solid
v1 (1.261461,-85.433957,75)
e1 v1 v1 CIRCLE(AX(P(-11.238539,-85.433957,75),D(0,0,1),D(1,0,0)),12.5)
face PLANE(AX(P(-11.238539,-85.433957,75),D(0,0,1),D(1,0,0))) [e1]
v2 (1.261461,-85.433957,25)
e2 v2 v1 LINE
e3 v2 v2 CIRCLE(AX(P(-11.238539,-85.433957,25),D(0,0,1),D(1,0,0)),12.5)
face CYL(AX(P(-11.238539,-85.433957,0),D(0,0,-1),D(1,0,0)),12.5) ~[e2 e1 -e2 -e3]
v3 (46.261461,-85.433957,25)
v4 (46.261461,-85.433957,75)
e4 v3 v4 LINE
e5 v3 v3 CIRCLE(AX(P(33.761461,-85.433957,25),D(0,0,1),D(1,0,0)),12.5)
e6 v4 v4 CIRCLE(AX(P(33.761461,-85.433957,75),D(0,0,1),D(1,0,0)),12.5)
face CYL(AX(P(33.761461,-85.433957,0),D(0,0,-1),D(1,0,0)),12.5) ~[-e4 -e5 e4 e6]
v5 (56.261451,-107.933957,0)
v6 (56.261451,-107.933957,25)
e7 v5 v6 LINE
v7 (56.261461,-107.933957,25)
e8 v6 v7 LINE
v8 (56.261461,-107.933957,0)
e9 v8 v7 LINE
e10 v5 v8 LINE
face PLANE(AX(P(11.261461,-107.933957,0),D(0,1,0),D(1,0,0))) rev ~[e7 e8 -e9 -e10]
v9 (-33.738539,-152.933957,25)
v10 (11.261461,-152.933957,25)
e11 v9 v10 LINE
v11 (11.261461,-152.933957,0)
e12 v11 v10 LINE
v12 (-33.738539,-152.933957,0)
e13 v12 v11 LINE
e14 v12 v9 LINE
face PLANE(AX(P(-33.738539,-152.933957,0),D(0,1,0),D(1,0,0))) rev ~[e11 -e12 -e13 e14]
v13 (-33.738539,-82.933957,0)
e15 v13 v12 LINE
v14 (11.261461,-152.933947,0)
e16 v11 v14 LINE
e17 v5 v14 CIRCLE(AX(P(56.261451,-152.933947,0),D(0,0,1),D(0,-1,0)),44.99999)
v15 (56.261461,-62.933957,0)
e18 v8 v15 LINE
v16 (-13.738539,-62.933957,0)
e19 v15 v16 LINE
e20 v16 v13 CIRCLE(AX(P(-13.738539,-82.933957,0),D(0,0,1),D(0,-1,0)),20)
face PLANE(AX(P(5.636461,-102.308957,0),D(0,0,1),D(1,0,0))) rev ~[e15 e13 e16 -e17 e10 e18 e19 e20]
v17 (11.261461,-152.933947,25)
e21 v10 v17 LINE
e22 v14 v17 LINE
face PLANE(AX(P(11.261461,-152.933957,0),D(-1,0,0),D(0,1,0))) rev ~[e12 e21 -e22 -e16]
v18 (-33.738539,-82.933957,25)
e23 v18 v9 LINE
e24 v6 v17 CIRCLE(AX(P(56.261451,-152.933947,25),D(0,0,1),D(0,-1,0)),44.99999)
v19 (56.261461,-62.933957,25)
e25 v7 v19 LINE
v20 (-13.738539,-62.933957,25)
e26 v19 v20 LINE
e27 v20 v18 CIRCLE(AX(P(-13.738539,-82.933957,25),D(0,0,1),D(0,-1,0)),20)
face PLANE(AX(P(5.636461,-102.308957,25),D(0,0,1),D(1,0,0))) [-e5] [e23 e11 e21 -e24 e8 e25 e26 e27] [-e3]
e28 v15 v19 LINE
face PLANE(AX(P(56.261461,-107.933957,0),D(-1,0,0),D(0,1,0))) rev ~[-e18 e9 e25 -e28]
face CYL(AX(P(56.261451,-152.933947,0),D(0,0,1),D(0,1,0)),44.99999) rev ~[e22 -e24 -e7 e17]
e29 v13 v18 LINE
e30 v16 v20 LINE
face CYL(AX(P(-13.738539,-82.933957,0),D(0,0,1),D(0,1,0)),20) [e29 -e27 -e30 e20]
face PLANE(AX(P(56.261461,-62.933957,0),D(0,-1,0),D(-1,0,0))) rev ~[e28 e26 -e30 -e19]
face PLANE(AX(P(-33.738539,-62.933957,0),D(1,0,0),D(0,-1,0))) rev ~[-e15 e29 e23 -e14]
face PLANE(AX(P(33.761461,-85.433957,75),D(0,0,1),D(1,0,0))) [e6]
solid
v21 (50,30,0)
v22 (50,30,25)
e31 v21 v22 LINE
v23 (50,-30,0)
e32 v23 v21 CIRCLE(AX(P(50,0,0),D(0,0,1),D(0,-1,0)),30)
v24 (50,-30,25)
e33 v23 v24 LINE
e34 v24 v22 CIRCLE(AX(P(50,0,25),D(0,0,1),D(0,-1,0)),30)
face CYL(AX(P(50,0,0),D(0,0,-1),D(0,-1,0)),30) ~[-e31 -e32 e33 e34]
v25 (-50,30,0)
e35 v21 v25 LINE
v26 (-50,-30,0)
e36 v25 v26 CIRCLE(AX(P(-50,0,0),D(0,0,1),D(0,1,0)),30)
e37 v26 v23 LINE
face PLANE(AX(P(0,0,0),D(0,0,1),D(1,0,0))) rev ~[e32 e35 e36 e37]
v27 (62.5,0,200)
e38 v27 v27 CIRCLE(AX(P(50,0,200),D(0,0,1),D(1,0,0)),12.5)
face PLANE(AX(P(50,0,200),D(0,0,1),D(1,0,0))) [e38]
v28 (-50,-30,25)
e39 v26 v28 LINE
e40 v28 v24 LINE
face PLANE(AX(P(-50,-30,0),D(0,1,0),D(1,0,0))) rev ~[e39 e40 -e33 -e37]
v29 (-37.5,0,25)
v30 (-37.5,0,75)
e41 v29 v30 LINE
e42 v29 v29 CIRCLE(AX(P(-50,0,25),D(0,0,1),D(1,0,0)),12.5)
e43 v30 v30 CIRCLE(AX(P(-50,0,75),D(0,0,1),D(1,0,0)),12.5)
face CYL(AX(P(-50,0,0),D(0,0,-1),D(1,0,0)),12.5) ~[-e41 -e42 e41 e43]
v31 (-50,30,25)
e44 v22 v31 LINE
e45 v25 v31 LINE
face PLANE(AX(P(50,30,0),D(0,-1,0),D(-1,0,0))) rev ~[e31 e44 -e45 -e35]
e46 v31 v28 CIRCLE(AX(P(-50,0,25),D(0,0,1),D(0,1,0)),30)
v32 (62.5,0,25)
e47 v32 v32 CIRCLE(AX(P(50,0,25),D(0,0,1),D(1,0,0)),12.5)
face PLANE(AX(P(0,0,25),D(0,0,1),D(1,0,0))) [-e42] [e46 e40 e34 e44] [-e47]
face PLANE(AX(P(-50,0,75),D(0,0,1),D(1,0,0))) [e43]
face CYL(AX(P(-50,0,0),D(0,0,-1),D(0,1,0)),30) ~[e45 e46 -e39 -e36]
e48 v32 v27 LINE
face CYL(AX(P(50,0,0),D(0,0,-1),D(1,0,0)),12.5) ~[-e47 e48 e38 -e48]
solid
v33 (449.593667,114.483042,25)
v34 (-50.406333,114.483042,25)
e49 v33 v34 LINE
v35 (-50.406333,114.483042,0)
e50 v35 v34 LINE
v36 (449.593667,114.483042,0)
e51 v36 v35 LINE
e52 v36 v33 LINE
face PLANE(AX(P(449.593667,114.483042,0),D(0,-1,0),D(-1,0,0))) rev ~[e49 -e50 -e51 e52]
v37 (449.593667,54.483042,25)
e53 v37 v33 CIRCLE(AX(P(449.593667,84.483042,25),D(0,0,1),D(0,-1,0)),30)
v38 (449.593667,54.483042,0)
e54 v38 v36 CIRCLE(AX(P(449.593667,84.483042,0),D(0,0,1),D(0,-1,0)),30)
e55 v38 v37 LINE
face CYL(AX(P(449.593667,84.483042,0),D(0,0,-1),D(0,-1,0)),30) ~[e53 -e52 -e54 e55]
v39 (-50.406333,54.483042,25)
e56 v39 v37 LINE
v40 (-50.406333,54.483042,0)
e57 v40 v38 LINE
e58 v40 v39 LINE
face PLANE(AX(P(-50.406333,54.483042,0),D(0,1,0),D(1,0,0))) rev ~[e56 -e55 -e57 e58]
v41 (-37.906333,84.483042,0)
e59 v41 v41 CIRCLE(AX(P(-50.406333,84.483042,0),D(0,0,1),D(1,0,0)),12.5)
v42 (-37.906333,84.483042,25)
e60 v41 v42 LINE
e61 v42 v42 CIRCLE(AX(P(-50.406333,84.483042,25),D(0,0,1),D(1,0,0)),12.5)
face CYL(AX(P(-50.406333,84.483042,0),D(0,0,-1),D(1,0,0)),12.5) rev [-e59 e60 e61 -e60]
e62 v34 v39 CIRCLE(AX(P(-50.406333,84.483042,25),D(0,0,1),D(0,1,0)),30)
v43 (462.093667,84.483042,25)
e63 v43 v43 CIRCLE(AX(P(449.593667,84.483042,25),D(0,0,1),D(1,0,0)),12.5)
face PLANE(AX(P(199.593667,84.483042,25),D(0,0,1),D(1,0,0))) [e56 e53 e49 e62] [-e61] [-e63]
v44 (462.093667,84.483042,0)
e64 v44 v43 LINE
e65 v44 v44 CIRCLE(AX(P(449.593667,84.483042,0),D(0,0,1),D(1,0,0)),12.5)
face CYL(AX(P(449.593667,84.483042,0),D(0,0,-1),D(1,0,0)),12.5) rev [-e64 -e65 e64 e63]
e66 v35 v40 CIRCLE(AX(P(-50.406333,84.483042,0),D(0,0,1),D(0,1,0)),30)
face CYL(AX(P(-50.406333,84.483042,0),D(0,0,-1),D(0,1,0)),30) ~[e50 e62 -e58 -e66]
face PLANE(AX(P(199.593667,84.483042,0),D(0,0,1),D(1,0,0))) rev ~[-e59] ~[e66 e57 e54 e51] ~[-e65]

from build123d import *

# Parameters (mm, degrees)
F0_R     = 12.5
F1_DEPTH = 25
F2_DEPTH = 200
F3_DEPTH = 75
F4_DEPTH = 25
F5_R     = 44.99999
F6_R     = 20
F7_DEPTH = 75
F8_DEPTH = 25


# Not quite as in the source:
# - a fillet or chamfer is up to 0.001 mm smaller than in the source, because OpenCascade refuses the exact size


with BuildPart() as f1:
    # F0 (on Top) → F1 (new body)
    with BuildSketch(Plane.XY):
        with BuildLine():
            ThreePointArc((50, -30), (80, 0), (50, 30))
            Line((50, 30), (-50, 30))
            ThreePointArc((-50, 30), (-80, 0), (-50, -30))
            Line((-50, -30), (50, -30))
        make_face()
        with Locations((-50, 0)):
            Circle(F0_R, mode=Mode.SUBTRACT)
        with Locations((50, 0)):
            Circle(F0_R, mode=Mode.SUBTRACT)
    extrude(amount=F1_DEPTH)

    # F0 (on Top) → F2 (join)
    with BuildSketch(Plane.XY):
        with Locations((50, 0)):
            Circle(F0_R)
    extrude(amount=F2_DEPTH)

    # F0 (on Top) → F3 (join)
    with BuildSketch(Plane.XY):
        with Locations((-50, 0)):
            Circle(F0_R)
    extrude(amount=F3_DEPTH)


with BuildPart() as f4:
    # F0 (on Top) → F4 (new body)
    with BuildSketch(Plane.XY):
        Polygon((56.2614613771, -107.9339570552), (56.2614613771, -62.9339570552), (-33.7385386229, -62.9339570552), (-33.7385386229, -152.9339570552), (11.2614613771, -152.9339570552), (11.2614613771, -107.9339570552), align=None)
        with Locations((-11.2385386229, -85.4339570552)):
            Circle(F0_R, mode=Mode.SUBTRACT)
        with Locations((33.7614613771, -85.4339570552)):
            Circle(F0_R, mode=Mode.SUBTRACT)
    extrude(amount=F4_DEPTH)

    # F5 (radius 45 in the source; OpenCascade refuses exactly that, so slightly less here)
    f5_edges = [f4.edges().sort_by_distance(p)[0] for p in [
        (11.261461, -107.933957, 12.5),
    ]]
    fillet(f5_edges, radius=F5_R)

    # F6
    f6_edges = [f4.edges().sort_by_distance(p)[0] for p in [
        (-33.738539, -62.933957, 12.5),
    ]]
    fillet(f6_edges, radius=F6_R)

    # F0 (on Top) → F7 (join)
    with BuildSketch(Plane.XY):
        with Locations((-11.2385386229, -85.4339570552)):
            Circle(F0_R)
        with Locations((33.7614613771, -85.4339570552)):
            Circle(F0_R)
    extrude(amount=F7_DEPTH)


with BuildPart() as f8:
    # F0 (on Top) → F8 (new body)
    with BuildSketch(Plane.XY):
        with BuildLine():
            ThreePointArc((449.5936667547, 54.4830423594), (479.5936667547, 84.4830423594), (449.5936667547, 114.4830423594))
            Line((449.5936667547, 114.4830423594), (-50.4063332453, 114.4830423594))
            ThreePointArc((-50.4063332453, 114.4830423594), (-80.4063332453, 84.4830423594), (-50.4063332453, 54.4830423594))
            Line((-50.4063332453, 54.4830423594), (449.5936667547, 54.4830423594))
        make_face()
        with Locations((-50.4063332453, 84.4830423594)):
            Circle(F0_R, mode=Mode.SUBTRACT)
        with Locations((449.5936667547, 84.4830423594)):
            Circle(F0_R, mode=Mode.SUBTRACT)
    extrude(amount=F8_DEPTH)


solid = Compound([f1.part, f4.part, f8.part])
